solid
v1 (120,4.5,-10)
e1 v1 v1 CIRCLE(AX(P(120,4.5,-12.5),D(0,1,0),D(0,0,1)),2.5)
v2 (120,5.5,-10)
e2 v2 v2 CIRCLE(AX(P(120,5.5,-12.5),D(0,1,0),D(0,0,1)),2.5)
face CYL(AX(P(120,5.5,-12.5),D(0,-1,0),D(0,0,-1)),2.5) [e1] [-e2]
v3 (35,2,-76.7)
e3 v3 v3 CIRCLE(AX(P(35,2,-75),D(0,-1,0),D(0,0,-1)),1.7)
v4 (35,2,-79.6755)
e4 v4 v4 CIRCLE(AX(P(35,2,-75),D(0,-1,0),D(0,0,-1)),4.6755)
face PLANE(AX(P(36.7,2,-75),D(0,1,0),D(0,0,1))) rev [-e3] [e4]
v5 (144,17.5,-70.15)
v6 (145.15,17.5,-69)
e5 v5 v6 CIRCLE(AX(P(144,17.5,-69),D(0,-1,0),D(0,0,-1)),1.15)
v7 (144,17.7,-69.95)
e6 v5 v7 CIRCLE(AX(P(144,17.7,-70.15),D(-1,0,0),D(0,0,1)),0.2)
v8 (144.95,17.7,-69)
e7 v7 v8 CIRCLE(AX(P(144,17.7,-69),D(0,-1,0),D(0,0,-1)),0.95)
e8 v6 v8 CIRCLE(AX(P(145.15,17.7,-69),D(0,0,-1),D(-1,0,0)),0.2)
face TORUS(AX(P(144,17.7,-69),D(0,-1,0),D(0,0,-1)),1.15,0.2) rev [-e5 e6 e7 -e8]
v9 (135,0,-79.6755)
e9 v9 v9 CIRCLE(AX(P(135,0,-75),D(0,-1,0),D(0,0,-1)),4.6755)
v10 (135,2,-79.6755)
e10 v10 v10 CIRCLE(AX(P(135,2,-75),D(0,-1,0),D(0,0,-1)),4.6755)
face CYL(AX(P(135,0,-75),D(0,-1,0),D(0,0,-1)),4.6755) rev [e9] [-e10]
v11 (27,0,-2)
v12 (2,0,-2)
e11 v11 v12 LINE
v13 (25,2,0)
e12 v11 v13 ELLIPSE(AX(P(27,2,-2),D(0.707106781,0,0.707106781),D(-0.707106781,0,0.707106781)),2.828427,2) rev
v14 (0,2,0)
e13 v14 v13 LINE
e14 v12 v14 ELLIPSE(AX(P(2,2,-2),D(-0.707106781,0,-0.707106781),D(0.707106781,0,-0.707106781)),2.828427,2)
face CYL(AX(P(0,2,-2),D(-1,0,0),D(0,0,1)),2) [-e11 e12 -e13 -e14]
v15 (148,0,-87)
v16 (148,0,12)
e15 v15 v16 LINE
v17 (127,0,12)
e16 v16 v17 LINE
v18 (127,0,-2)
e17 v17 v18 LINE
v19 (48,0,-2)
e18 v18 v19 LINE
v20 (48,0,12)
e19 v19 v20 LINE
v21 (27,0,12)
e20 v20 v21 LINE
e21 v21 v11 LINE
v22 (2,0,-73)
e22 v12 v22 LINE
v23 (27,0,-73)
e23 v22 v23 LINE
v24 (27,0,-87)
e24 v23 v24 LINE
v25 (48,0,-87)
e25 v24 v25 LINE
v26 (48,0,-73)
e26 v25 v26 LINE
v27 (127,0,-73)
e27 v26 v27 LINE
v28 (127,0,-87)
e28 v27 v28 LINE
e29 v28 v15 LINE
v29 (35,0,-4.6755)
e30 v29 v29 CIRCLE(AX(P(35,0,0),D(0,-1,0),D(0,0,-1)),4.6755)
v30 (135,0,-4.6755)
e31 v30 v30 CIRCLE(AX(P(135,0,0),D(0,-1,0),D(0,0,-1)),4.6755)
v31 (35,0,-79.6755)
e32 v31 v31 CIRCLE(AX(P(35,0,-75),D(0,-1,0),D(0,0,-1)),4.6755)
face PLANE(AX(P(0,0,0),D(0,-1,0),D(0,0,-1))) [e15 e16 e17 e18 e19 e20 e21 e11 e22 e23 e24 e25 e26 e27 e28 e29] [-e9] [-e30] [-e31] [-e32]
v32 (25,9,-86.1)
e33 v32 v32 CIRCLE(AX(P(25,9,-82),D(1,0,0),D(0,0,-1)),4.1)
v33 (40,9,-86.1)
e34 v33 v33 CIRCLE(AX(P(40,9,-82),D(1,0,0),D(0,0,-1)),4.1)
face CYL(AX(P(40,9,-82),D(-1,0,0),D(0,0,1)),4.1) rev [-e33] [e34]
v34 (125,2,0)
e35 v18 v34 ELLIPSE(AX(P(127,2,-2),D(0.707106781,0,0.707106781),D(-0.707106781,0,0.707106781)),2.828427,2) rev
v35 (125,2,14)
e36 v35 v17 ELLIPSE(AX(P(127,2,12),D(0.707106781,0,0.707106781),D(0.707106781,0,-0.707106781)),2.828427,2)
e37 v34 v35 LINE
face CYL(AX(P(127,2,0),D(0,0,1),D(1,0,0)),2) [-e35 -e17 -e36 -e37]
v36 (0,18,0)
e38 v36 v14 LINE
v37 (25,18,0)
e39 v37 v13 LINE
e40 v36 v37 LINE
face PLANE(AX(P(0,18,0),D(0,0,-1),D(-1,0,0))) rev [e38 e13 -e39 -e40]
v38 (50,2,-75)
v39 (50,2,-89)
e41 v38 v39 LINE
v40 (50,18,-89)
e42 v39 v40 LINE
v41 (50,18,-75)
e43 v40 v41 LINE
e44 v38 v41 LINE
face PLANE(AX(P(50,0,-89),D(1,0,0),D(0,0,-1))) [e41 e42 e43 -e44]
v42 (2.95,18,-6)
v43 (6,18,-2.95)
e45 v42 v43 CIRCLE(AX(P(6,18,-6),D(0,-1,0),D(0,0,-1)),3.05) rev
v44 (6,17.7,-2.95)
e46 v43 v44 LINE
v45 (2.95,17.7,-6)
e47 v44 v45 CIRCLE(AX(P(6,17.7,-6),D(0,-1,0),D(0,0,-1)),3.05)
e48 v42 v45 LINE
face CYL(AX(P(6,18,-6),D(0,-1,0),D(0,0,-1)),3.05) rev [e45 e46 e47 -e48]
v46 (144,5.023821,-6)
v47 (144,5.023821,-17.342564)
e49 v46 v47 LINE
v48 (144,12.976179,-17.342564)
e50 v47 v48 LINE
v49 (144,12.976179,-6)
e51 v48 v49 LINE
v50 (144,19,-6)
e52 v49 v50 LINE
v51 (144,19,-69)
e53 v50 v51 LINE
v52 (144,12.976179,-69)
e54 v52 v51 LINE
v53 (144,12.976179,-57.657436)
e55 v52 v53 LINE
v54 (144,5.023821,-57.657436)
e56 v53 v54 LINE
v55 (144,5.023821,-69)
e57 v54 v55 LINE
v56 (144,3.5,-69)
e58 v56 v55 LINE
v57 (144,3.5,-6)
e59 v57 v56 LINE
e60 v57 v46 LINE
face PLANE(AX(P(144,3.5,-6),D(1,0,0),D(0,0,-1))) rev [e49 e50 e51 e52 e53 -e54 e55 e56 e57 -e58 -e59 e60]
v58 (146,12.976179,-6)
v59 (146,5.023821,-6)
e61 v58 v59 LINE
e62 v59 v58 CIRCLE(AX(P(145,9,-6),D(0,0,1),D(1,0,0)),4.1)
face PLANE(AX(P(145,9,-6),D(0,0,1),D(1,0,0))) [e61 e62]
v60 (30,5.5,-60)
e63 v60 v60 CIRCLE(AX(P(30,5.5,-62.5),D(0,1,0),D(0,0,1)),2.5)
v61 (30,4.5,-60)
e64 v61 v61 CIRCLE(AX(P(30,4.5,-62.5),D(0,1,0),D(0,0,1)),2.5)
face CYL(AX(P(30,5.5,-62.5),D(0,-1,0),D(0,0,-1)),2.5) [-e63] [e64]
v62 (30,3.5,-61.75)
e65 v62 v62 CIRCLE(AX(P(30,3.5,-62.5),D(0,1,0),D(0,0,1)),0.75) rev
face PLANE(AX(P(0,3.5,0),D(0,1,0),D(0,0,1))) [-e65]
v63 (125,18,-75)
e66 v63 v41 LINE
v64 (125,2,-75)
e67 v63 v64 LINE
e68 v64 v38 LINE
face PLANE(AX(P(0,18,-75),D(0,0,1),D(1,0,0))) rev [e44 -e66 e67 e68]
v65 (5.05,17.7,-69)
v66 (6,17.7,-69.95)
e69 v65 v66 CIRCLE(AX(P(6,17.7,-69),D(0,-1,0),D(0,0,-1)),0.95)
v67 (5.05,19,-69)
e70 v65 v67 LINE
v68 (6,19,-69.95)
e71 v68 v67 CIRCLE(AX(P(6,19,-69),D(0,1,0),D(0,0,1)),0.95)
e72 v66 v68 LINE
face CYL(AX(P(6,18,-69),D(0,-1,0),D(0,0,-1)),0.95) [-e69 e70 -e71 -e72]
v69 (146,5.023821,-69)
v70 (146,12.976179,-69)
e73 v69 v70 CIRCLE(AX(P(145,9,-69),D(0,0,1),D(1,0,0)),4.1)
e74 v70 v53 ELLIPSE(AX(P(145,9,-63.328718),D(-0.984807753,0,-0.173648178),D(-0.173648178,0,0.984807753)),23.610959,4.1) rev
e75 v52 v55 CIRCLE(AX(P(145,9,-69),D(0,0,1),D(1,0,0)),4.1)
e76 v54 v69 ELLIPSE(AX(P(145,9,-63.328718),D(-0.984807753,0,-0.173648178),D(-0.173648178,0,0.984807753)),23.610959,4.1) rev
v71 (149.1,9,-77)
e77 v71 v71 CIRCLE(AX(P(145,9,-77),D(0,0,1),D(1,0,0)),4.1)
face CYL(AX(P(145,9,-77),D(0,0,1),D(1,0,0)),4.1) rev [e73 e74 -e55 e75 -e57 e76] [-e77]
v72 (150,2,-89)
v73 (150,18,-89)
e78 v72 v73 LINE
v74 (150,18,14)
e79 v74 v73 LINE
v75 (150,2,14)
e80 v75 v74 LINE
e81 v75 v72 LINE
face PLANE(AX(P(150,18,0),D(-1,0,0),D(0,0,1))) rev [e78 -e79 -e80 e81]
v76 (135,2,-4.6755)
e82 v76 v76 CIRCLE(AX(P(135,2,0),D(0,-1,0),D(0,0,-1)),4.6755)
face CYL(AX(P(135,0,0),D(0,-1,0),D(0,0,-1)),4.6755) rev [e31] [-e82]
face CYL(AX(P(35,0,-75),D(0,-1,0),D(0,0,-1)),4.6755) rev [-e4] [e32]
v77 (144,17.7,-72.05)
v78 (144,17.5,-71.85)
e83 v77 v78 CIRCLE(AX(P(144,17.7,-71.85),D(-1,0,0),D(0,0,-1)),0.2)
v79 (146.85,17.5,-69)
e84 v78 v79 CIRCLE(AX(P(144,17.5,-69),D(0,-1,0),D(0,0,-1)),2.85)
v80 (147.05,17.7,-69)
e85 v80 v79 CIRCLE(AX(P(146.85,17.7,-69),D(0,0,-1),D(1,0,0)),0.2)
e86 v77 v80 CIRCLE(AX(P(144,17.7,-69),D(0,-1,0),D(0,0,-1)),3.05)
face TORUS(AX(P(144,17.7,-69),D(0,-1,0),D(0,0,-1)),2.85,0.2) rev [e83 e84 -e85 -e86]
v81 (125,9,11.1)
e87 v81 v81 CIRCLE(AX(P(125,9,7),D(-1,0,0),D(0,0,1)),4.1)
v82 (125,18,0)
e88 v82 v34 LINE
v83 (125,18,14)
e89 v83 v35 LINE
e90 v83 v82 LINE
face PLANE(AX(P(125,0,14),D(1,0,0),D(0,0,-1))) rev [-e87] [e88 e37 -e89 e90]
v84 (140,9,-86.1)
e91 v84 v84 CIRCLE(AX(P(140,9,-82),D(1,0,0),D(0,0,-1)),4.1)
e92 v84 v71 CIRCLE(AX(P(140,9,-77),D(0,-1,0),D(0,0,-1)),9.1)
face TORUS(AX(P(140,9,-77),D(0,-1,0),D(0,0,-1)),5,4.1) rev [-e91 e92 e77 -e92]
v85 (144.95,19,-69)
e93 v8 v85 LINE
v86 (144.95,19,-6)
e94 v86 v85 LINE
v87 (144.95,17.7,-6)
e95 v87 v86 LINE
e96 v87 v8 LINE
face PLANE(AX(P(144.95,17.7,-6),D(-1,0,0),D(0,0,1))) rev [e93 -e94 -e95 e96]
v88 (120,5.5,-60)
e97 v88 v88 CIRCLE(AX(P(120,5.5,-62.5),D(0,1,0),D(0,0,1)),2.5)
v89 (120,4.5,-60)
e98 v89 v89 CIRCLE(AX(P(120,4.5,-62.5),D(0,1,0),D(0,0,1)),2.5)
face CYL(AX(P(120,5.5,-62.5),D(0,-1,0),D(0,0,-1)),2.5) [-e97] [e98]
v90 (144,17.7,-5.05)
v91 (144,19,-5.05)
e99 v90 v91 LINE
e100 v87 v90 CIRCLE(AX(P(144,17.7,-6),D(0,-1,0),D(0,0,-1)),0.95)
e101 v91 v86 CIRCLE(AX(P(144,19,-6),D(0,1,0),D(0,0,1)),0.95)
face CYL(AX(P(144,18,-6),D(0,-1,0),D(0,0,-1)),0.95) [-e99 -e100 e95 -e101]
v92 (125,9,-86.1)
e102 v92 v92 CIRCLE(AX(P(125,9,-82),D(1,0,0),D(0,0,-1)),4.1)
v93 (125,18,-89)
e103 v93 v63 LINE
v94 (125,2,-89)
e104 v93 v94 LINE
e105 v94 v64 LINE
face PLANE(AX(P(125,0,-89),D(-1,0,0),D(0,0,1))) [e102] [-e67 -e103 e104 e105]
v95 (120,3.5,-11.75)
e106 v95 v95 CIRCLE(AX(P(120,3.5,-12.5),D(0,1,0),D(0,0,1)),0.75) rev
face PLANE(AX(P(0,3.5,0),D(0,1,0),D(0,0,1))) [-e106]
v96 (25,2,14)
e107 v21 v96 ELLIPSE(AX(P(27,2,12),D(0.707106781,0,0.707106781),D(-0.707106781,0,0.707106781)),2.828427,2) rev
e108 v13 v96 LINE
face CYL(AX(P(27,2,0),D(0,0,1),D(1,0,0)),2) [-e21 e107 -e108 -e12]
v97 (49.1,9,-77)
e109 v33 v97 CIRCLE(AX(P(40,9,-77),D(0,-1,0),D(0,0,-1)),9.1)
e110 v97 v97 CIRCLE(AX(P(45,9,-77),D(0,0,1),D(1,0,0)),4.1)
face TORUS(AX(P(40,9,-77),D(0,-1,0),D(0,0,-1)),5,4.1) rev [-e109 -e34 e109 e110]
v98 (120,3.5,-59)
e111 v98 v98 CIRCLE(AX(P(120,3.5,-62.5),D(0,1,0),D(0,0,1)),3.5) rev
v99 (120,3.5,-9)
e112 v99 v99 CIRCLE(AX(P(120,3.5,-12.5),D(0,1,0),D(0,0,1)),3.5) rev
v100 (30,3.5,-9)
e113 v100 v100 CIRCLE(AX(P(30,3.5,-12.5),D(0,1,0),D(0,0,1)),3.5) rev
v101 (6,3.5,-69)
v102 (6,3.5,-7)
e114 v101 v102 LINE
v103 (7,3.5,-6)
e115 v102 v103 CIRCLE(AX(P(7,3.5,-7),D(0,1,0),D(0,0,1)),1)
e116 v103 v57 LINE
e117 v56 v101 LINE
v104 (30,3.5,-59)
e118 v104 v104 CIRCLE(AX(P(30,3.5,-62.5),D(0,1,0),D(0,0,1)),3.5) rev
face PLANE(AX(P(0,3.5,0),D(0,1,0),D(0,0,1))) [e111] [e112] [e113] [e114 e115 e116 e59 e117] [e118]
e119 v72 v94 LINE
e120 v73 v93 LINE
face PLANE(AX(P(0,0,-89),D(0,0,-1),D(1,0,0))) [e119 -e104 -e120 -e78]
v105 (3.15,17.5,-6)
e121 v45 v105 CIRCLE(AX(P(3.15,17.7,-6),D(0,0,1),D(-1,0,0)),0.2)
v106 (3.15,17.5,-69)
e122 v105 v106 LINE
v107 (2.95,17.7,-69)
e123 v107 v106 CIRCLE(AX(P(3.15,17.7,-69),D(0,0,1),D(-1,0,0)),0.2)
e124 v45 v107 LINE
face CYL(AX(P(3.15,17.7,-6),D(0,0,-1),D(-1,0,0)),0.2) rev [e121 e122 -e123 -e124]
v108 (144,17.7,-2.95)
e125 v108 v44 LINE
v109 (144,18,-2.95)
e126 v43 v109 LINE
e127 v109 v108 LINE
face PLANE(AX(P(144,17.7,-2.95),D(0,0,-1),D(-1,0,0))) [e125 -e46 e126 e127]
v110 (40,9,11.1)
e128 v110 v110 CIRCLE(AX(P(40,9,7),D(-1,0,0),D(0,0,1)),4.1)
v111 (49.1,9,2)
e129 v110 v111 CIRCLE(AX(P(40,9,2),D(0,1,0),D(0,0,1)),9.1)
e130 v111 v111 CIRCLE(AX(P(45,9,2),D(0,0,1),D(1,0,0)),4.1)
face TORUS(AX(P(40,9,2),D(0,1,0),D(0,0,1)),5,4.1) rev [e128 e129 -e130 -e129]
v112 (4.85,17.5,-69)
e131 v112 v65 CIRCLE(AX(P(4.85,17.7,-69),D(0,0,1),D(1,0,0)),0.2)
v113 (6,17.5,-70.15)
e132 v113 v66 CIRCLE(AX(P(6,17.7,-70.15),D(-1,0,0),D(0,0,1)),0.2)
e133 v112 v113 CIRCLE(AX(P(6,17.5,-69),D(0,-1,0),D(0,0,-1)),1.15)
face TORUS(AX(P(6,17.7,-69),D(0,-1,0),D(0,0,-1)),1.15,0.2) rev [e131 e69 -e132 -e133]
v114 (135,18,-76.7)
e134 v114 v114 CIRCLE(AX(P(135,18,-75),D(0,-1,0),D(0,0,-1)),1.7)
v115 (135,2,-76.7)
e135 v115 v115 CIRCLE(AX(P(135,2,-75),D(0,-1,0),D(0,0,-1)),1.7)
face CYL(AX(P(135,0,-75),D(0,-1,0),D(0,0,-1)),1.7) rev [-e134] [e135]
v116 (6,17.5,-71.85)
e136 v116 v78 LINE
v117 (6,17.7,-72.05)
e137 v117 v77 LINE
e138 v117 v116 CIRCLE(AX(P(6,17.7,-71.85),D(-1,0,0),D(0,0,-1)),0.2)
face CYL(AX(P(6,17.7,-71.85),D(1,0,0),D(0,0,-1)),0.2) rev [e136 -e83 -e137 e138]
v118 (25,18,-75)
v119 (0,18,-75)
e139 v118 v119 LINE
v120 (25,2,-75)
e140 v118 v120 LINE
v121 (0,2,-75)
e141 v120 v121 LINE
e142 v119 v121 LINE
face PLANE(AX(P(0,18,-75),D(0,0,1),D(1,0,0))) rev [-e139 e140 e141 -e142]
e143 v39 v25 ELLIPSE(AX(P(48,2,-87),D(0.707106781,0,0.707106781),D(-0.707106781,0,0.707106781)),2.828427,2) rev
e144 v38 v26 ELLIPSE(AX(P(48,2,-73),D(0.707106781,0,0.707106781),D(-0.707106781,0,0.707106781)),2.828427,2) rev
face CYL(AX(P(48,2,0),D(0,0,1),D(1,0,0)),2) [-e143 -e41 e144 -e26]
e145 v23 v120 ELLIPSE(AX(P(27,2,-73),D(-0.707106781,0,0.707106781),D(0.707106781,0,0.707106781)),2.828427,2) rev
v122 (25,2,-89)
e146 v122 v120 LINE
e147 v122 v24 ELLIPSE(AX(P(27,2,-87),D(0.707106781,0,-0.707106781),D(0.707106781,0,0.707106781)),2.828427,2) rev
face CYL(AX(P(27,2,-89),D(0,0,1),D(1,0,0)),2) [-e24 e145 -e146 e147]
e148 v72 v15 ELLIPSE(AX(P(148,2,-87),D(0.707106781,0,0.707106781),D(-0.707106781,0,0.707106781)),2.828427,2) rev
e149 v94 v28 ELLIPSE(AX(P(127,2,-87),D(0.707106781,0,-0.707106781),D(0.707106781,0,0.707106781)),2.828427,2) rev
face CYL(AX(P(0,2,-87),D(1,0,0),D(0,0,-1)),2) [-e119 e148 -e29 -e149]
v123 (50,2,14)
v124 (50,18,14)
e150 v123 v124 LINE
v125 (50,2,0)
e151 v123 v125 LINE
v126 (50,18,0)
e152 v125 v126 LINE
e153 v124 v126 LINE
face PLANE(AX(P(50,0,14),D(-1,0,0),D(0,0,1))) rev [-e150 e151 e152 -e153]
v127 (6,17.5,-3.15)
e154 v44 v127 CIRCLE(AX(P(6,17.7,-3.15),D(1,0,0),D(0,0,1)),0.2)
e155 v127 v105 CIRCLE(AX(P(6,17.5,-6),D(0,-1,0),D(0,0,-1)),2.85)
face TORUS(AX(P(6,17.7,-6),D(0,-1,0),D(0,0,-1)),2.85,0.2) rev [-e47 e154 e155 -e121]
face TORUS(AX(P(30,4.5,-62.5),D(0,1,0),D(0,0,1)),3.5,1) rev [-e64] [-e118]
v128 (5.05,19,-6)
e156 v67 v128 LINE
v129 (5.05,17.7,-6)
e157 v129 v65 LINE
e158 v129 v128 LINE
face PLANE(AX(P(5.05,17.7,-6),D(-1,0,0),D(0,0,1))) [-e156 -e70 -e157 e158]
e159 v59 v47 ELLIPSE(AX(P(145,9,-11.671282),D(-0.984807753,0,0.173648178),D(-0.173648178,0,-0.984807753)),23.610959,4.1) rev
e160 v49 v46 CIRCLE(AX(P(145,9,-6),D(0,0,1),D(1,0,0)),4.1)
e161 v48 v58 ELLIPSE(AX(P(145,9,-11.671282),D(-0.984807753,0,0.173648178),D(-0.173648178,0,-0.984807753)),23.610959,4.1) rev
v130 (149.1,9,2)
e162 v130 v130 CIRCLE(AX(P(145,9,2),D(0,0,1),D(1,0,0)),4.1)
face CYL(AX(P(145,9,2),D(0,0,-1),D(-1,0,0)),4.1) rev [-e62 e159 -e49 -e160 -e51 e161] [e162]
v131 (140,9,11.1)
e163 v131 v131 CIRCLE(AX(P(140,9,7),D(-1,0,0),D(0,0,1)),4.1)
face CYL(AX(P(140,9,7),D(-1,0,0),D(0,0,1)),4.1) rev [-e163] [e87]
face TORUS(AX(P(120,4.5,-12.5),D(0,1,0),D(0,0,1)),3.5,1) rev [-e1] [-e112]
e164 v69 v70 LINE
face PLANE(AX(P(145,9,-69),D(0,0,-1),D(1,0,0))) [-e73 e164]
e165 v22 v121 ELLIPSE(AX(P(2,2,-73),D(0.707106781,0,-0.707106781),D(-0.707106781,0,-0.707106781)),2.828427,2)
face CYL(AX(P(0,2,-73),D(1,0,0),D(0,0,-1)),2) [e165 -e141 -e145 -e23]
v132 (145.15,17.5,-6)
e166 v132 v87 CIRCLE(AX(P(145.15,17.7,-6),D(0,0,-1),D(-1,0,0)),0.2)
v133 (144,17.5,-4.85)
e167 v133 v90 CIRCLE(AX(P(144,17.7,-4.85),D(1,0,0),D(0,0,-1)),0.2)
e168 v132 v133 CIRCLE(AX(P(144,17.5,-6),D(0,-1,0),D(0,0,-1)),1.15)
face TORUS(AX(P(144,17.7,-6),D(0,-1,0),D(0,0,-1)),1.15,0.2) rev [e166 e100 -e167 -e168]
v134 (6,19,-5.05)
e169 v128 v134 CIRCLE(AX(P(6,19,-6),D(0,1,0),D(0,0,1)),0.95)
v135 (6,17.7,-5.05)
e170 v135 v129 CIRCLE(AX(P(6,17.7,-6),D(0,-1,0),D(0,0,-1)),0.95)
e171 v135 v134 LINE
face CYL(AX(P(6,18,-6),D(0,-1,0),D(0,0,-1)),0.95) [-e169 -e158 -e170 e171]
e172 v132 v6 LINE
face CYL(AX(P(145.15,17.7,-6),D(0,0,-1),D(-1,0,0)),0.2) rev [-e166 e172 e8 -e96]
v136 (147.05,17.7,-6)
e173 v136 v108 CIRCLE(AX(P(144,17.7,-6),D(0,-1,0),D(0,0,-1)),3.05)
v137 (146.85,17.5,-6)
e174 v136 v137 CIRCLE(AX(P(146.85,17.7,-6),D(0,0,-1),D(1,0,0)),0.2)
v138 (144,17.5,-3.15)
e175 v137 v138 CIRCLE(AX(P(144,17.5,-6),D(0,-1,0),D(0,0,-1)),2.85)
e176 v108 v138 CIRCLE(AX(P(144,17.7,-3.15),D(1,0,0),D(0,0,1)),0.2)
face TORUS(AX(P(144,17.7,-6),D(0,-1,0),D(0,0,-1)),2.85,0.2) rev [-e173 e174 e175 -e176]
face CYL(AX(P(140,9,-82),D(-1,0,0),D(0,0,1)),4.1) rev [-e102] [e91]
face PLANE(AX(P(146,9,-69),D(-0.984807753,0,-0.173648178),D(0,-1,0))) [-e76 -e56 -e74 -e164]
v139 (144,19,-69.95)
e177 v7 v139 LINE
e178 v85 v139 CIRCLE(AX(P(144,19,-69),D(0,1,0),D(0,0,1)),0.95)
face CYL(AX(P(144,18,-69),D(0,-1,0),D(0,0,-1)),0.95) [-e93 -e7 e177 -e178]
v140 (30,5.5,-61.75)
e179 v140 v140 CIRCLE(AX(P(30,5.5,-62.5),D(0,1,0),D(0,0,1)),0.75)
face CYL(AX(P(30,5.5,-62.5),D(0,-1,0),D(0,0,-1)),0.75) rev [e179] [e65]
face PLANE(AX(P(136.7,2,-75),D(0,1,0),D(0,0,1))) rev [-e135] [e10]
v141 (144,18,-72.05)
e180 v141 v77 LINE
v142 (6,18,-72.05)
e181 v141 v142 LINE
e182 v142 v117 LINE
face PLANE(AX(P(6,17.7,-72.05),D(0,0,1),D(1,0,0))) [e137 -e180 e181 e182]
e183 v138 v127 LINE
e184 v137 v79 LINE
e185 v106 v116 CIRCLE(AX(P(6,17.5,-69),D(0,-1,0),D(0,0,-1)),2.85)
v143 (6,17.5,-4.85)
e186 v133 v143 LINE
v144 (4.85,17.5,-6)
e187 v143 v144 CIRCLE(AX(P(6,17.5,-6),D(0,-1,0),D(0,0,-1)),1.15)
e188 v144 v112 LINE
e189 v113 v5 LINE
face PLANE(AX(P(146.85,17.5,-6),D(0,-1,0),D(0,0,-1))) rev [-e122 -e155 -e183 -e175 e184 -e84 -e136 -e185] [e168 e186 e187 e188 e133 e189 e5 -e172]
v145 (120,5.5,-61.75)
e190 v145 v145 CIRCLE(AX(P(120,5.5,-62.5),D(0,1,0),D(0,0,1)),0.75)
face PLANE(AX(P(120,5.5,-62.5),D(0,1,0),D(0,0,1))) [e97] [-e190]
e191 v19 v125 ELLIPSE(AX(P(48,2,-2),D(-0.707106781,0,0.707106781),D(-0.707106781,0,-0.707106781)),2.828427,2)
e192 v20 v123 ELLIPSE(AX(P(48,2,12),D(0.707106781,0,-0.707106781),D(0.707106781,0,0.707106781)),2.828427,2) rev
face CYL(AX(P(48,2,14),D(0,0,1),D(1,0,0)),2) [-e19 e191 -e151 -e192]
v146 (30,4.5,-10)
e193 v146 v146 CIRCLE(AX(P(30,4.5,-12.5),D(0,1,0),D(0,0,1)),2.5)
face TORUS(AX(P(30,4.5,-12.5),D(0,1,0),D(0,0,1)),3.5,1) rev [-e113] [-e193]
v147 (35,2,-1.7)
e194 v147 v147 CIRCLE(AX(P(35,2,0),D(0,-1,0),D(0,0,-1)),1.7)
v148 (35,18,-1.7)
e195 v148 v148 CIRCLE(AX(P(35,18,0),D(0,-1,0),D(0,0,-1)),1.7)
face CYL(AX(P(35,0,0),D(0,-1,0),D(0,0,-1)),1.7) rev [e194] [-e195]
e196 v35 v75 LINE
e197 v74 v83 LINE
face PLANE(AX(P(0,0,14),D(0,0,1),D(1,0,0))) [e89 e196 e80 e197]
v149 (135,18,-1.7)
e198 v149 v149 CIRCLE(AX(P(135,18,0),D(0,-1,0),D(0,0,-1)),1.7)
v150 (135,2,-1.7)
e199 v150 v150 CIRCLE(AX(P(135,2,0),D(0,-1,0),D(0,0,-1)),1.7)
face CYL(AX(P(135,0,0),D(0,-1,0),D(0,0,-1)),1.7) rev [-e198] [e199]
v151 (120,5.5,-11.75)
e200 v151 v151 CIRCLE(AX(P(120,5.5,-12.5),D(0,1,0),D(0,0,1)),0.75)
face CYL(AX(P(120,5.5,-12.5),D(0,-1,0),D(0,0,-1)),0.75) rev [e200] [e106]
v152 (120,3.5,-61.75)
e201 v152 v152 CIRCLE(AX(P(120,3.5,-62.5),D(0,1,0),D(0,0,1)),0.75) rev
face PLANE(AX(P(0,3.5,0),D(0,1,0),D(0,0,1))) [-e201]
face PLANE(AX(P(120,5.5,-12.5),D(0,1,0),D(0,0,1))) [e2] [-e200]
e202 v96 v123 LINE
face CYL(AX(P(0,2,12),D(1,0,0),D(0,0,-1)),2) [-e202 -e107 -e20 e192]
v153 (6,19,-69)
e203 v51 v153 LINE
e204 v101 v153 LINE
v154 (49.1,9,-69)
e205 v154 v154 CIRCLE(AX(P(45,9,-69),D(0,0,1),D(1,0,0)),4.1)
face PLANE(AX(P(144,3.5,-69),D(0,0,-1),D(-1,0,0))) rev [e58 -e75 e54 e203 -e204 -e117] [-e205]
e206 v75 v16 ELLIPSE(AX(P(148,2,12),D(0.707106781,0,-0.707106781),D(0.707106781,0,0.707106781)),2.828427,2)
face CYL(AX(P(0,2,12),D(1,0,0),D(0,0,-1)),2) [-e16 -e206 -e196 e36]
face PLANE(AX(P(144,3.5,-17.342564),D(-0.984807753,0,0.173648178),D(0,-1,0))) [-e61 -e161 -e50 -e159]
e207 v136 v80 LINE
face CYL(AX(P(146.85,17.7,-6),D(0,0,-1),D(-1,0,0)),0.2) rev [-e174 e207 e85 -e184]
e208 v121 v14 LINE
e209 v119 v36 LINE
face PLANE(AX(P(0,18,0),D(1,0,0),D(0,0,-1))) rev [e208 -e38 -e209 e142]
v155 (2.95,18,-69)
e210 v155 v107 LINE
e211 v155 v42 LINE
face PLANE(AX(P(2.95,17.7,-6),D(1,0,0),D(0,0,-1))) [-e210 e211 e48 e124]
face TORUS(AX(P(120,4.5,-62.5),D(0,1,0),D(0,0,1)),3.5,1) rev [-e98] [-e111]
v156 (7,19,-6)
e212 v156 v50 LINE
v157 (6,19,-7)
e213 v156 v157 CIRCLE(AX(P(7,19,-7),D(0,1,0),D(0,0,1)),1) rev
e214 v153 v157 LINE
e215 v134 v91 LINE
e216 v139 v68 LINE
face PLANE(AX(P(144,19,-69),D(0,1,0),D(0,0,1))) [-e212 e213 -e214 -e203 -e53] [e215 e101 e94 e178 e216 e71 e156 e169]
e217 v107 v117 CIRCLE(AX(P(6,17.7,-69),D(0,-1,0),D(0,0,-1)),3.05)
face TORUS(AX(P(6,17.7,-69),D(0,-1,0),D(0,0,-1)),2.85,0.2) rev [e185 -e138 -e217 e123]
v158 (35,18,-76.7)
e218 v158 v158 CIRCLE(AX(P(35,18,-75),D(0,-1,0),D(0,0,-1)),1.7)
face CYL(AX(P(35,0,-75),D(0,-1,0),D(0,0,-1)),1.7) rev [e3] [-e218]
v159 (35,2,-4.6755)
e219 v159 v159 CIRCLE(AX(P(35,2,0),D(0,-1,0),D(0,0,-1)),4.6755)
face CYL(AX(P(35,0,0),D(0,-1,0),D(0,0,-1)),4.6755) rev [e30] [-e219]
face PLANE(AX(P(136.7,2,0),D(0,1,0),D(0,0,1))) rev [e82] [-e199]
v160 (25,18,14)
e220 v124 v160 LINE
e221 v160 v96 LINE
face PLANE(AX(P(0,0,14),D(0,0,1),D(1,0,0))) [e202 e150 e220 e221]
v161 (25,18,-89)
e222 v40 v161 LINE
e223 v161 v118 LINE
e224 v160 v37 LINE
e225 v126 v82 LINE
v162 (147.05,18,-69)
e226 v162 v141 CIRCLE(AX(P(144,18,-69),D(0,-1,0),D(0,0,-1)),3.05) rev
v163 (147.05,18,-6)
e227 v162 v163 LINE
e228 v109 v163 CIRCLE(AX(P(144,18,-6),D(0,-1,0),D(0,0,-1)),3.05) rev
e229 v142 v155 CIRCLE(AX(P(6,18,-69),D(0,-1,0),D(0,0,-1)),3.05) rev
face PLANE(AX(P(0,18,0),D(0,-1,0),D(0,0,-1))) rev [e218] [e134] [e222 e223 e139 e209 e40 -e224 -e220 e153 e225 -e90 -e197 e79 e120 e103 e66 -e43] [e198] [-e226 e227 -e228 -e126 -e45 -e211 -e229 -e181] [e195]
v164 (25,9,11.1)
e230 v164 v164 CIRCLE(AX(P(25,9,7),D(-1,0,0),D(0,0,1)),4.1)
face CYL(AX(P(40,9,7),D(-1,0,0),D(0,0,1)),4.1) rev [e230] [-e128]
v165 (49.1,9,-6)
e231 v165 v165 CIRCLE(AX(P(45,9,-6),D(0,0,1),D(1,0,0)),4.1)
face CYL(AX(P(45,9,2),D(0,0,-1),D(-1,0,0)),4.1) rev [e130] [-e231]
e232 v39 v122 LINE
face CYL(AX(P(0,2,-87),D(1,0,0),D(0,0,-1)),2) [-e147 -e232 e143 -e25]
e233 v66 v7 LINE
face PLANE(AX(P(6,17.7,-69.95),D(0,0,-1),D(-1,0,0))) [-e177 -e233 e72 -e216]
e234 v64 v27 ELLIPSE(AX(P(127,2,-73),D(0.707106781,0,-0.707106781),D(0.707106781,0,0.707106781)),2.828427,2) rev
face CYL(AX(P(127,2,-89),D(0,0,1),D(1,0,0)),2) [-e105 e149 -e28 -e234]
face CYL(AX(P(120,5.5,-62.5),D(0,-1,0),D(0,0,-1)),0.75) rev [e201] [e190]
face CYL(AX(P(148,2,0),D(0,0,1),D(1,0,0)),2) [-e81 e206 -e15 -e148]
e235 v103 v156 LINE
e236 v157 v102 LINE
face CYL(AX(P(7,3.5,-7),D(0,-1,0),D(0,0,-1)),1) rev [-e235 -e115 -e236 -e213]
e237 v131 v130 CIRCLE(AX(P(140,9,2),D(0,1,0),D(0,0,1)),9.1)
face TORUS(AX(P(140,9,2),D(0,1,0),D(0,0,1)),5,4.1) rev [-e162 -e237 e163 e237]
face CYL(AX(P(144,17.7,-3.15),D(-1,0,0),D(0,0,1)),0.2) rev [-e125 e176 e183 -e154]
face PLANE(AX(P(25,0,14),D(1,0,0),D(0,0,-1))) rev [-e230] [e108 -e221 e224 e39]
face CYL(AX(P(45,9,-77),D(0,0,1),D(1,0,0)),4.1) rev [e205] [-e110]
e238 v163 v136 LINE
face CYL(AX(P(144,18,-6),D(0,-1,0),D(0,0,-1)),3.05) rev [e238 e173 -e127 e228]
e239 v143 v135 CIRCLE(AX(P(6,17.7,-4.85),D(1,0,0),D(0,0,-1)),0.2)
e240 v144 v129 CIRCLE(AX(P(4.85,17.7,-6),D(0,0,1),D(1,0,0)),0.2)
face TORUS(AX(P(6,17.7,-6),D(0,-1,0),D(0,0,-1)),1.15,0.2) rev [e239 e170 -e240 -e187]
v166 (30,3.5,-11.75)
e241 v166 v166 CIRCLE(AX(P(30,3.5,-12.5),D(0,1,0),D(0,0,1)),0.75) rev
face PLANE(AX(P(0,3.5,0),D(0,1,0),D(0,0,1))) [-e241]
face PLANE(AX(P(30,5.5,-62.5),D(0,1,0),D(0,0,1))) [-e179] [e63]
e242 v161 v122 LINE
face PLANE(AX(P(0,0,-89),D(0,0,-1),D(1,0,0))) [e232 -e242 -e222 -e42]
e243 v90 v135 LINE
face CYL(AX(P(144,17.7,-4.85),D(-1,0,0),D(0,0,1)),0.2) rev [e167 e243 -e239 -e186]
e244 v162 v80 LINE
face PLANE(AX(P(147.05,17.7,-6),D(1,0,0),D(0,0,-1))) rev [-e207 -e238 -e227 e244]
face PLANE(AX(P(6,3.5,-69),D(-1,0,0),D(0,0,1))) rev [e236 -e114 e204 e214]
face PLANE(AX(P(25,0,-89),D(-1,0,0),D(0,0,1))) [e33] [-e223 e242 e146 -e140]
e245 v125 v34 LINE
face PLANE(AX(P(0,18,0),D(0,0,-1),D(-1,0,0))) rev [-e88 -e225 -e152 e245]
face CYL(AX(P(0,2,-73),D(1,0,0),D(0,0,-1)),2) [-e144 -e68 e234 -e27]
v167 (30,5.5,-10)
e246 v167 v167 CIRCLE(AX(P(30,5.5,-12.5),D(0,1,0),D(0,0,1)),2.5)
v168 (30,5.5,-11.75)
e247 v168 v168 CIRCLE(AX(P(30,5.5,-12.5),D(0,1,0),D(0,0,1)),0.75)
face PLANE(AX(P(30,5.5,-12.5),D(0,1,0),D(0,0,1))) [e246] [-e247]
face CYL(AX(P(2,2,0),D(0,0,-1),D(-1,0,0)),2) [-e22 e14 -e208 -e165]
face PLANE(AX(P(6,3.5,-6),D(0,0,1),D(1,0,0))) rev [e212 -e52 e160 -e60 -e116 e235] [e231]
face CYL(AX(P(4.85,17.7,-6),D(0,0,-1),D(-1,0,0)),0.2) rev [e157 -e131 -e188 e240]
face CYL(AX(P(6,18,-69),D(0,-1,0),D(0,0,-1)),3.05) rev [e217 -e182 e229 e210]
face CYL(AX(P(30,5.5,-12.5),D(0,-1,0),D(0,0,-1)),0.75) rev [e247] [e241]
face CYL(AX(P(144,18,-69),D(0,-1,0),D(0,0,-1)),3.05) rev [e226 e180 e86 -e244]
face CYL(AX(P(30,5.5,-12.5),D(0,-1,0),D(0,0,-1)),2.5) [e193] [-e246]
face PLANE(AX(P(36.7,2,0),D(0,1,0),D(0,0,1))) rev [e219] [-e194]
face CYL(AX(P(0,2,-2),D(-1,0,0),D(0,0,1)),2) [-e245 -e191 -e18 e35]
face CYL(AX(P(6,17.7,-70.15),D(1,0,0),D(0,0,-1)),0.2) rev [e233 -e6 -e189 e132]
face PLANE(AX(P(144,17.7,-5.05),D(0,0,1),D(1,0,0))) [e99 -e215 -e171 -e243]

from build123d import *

# Parameters (mm, degrees)
SKETCH1_W                                    = 150
SKETCH1_H                                    = 75
BOSS_EXTRUDE1_DEPTH                          = 18
SKETCH5_W                                    = 138
SKETCH5_H                                    = 63
CUT_EXTRUDE2_DEPTH                           = 14.5
SKETCH2_W                                    = 25
SKETCH2_H                                    = 18
BOSS_EXTRUDE2_DEPTH                          = 14
SKETCH3_R                                    = 4.1
SKETCH7_R                                    = 4.1
CHAMFER3_SIZE                                = 11.342563639
CHAMFER3_SIZE_2                              = 2
FILLET3_R                                    = 2
CHAMFER4_SIZE                                = 11.342563639
CHAMFER4_SIZE_2                              = 2
CBORE_FOR_M3_HEX_HEAD_CAP_SCREW1_D           = 3.4
CBORE_FOR_M3_HEX_HEAD_CAP_SCREW1_CBORE_D     = 9.351
CBORE_FOR_M3_HEX_HEAD_CAP_SCREW1_CBORE_DEPTH = 2
BOSS_EXTRUDE3_START                          = 1
SKETCH19_W                                   = 138
SKETCH19_H                                   = 63
BOSS_EXTRUDE3_DEPTH                          = 1
SKETCH20_R                                   = 2.5
SKETCH20_R_2                                 = 0.75
BOSS_EXTRUDE4_DEPTH                          = 2
FILLET4_R                                    = 1


with BuildPart() as part:
    # Sketch1 → Boss-Extrude1 (new body)
    with BuildSketch(Plane(origin=(0, 0, 0), x_dir=(1, 0, 0), z_dir=(0, 1, 0))):
        with Locations((75, 37.5)):
            Rectangle(SKETCH1_W, SKETCH1_H)
    extrude(amount=BOSS_EXTRUDE1_DEPTH)

    # Sketch5 → Cut-Extrude2 (cut)
    with BuildSketch(Plane(origin=(0, 18, 0), x_dir=(1, 0, 0), z_dir=(0, 1, 0))):
        with Locations((75, 37.5)):
            Rectangle(SKETCH5_W, SKETCH5_H)
    extrude(amount=-CUT_EXTRUDE2_DEPTH, mode=Mode.SUBTRACT)

    # Sketch2 → Boss-Extrude2 (add)
    with BuildSketch(Plane.XY):
        with Locations((137.5, 9)):
            Rectangle(SKETCH2_W, SKETCH2_H)
        with Locations((37.5, 9)):
            Rectangle(SKETCH2_W, SKETCH2_H)
    boss_extrude2 = extrude(amount=BOSS_EXTRUDE2_DEPTH)

    # Cut-Sweep1: sweep along a path in Sketch6
    with BuildLine(Plane(origin=(0, 9, 0), x_dir=(1, 0, 0), z_dir=(0, 1, 0))) as cut_sweep1_path:
        Line((25, -7), (40, -7))
        ThreePointArc((40, -7), (43.535533906, -5.535533906), (45, -2))
        Line((45, -2), (45, 6))
    # Sketch3 → Cut-Sweep1 (sweep, cut)
    with BuildSketch(Plane.ZY.offset(-25)):
        with Locations((7, 9)):
            Circle(SKETCH3_R)
    cut_sweep1 = sweep(path=cut_sweep1_path.line, mode=Mode.SUBTRACT)

    # Cut-Sweep2: sweep along a path in Sketch8
    with BuildLine(Plane(origin=(0, 9, 0), x_dir=(1, 0, 0), z_dir=(0, 1, 0))) as cut_sweep2_path:
        Line((125, -7), (140, -7))
        ThreePointArc((140, -7), (143.535533906, -5.535533906), (145, -2))
        Line((145, -2), (145, 6))
    # Sketch7 → Cut-Sweep2 (sweep, cut)
    with BuildSketch(Plane.ZY.offset(-125)):
        with Locations((7, 9)):
            Circle(SKETCH7_R)
    cut_sweep2 = sweep(path=cut_sweep2_path.line, mode=Mode.SUBTRACT)

    # Chamfer3
    # the kernel refuses this chamfer: 11.342563639, 2 mm, written as the material it takes off along each edge
    with BuildSketch(Plane(origin=(144, 42.450270738, -6), x_dir=(-0.0066825316561019464, 0, -0.9999776716360547), z_dir=(0, -1, 0))) as chamfer3_piece_1_section:
        Polygon((CHAMFER3_SIZE * 0.999977671657, CHAMFER3_SIZE * 0.00668253165624), (-CHAMFER3_SIZE_2 * 0.0066825316561, CHAMFER3_SIZE_2 * 0.999977671636), (0, 0), align=None)
    chamfer3_piece_1 = extrude(amount=66.900541476, mode=Mode.PRIVATE)
    chamfer3_piece_1 = chamfer3_piece_1 & Plane(origin=(145, 9, -9.773182529), x_dir=(1, 0, 0), z_dir=(0, 0, -1)) * Cylinder(4.1, 180, mode=Mode.PRIVATE)
    add(chamfer3_piece_1, mode=Mode.SUBTRACT)

    # Mirror1: Boss-Extrude2, Cut-Sweep1, Cut-Sweep2 across plane
    add(boss_extrude2.mirror(Plane(origin=(0, 0, -37.5), x_dir=(1, 0, 0), z_dir=(0, 0, -1))))
    add(cut_sweep1.mirror(Plane(origin=(0, 0, -37.5), x_dir=(1, 0, 0), z_dir=(0, 0, -1))), mode=Mode.SUBTRACT)
    add(cut_sweep2.mirror(Plane(origin=(0, 0, -37.5), x_dir=(1, 0, 0), z_dir=(0, 0, -1))), mode=Mode.SUBTRACT)

    # Cut-Sweep3: sweep along a path in Sketch10
    with BuildLine(Plane(origin=(0, 18, 0), x_dir=(1, 0, 0), z_dir=(0, 1, 0))) as cut_sweep3_path:
        Line((6, 4), (144, 4))
        ThreePointArc((144, 4), (145.414213562, 4.585786438), (146, 6))
        Line((146, 6), (146, 69))
        ThreePointArc((146, 69), (145.414213562, 70.414213562), (144, 71))
        Line((144, 71), (6, 71))
        ThreePointArc((6, 71), (4.585786438, 70.414213562), (4, 69))
        Line((4, 69), (4, 6))
        ThreePointArc((4, 6), (4.585786438, 4.585786438), (6, 4))
    # Sketch11 → Cut-Sweep3 (sweep, cut)
    with BuildSketch(Plane(origin=(0, 0, -37.5), x_dir=(-1, 0, 0), z_dir=(0, 0, -1))):
        with BuildLine():
            Line((-146.85, 17.5), (-145.15, 17.5))
            ThreePointArc((-145.15, 17.5), (-145.008578644, 17.558578644), (-144.95, 17.7))
            Line((-144.95, 17.7), (-144.95, 18.5))
            Line((-144.95, 18.5), (-147.05, 18.5))
            Line((-147.05, 18.5), (-147.05, 17.7))
            ThreePointArc((-147.05, 17.7), (-146.991421356, 17.558578644), (-146.85, 17.5))
        make_face()
    sweep(path=cut_sweep3_path.line, mode=Mode.SUBTRACT)

    # Fillet3
    fillet3_edges = [part.edges().sort_by_distance(p)[0] for p in [
        (125, 0, 7),
        (137.5, 0, 14),
        (87.5, 0, 0),
        (50, 0, 7),
        (25, 0, 7),
        (37.5, 0, 14),
        (150, 0, -37.5),
        (12.5, 0, 0),
        (0, 0, -37.5),
        (87.5, 0, -75),
        (137.5, 0, -89),
        (125, 0, -82),
        (12.5, 0, -75),
        (37.5, 0, -89),
        (50, 0, -82),
        (25, 0, -82),
    ]]
    fillet(fillet3_edges, radius=FILLET3_R)

    # Chamfer4
    # the kernel refuses this chamfer: 11.342563639, 2 mm, written as the material it takes off along each edge
    with BuildSketch(Plane(origin=(144, 42.450270738, -69), x_dir=(-0.0066825316561019525, 0, 0.9999776716360547), z_dir=(0, -1, 0))) as chamfer4_piece_1_section:
        Polygon((CHAMFER4_SIZE * 0.999977671657, -CHAMFER4_SIZE * 0.00668253165624), (-CHAMFER4_SIZE_2 * 0.0066825316561, -CHAMFER4_SIZE_2 * 0.999977671636), (0, 0), align=None)
    chamfer4_piece_1 = extrude(amount=66.900541476, mode=Mode.PRIVATE)
    chamfer4_piece_1 = chamfer4_piece_1 & Plane(origin=(145, 9, -64.160048401), x_dir=(1, 0, 0), z_dir=(0, 0, 1)) * Cylinder(4.1, 180, mode=Mode.PRIVATE)
    add(chamfer4_piece_1, mode=Mode.SUBTRACT)

    # CBORE for M3 Hex Head Cap Screw1 (through all)
    with Locations(Plane(origin=(0, 0, 0), x_dir=(-1, 0, 0), z_dir=(0, -1, 0))):
        with Locations((-35, 0), (-35, 75), (-135, 75), (-135, 0)):
            CounterBoreHole(CBORE_FOR_M3_HEX_HEAD_CAP_SCREW1_D / 2, CBORE_FOR_M3_HEX_HEAD_CAP_SCREW1_CBORE_D / 2, CBORE_FOR_M3_HEX_HEAD_CAP_SCREW1_CBORE_DEPTH)

    # Sketch19 → Boss-Extrude3 (add)
    with BuildSketch(Plane(origin=(0, 18, 0), x_dir=(1, 0, 0), z_dir=(0, 1, 0)).offset(BOSS_EXTRUDE3_START)):
        with BuildLine():
            Line((144, 69.95), (6, 69.95))
            ThreePointArc((6, 69.95), (5.328248558, 69.671751442), (5.05, 69))
            Line((5.05, 69), (5.05, 6))
            ThreePointArc((5.05, 6), (5.328248558, 5.328248558), (6, 5.05))
            Line((6, 5.05), (144, 5.05))
            ThreePointArc((144, 5.05), (144.671751442, 5.328248558), (144.95, 6))
            Line((144.95, 6), (144.95, 69))
            ThreePointArc((144.95, 69), (144.671751442, 69.671751442), (144, 69.95))
        make_face()
        with Locations((75, 37.5)):
            Rectangle(SKETCH19_W, SKETCH19_H, mode=Mode.SUBTRACT)
    extrude(amount=-BOSS_EXTRUDE3_DEPTH)

    # Sketch20 → Boss-Extrude4 (add)
    # profile 1 of 4: a face of its own
    with BuildSketch(Plane(origin=(0, 3.5, 0), x_dir=(1, 0, 0), z_dir=(0, 1, 0))):
        with Locations(Location((120, 62.5, 0), (0, 0, 270))):
            Circle(SKETCH20_R)
        with Locations(Location((120, 62.5, 0), (0, 0, 270))):
            Circle(SKETCH20_R_2, mode=Mode.SUBTRACT)
    # profile 2 of 4: a face of its own
    with BuildSketch(Plane(origin=(0, 3.5, 0), x_dir=(1, 0, 0), z_dir=(0, 1, 0))):
        with Locations(Location((120, 12.5, 0), (0, 0, 270))):
            Circle(SKETCH20_R)
        with Locations(Location((120, 12.5, 0), (0, 0, 270))):
            Circle(SKETCH20_R_2, mode=Mode.SUBTRACT)
    # profile 3 of 4: a face of its own
    with BuildSketch(Plane(origin=(0, 3.5, 0), x_dir=(1, 0, 0), z_dir=(0, 1, 0))):
        with Locations(Location((30, 12.5, 0), (0, 0, 270))):
            Circle(SKETCH20_R)
        with Locations(Location((30, 12.5, 0), (0, 0, 270))):
            Circle(SKETCH20_R_2, mode=Mode.SUBTRACT)
    # profile 4 of 4: a face of its own
    with BuildSketch(Plane(origin=(0, 3.5, 0), x_dir=(1, 0, 0), z_dir=(0, 1, 0))):
        with Locations(Location((30, 62.5, 0), (0, 0, 270))):
            Circle(SKETCH20_R)
        with Locations(Location((30, 62.5, 0), (0, 0, 270))):
            Circle(SKETCH20_R_2, mode=Mode.SUBTRACT)
    extrude(amount=BOSS_EXTRUDE4_DEPTH)

    # Fillet4
    fillet4_edges = [part.edges().sort_by_distance(p)[0] for p in [
        (6, 11.25, -6),
        (120, 3.5, -65),
        (120, 3.5, -15),
        (30, 3.5, -15),
        (30, 3.5, -65),
    ]]
    fillet(fillet4_edges, radius=FILLET4_R)


solid = part.part
